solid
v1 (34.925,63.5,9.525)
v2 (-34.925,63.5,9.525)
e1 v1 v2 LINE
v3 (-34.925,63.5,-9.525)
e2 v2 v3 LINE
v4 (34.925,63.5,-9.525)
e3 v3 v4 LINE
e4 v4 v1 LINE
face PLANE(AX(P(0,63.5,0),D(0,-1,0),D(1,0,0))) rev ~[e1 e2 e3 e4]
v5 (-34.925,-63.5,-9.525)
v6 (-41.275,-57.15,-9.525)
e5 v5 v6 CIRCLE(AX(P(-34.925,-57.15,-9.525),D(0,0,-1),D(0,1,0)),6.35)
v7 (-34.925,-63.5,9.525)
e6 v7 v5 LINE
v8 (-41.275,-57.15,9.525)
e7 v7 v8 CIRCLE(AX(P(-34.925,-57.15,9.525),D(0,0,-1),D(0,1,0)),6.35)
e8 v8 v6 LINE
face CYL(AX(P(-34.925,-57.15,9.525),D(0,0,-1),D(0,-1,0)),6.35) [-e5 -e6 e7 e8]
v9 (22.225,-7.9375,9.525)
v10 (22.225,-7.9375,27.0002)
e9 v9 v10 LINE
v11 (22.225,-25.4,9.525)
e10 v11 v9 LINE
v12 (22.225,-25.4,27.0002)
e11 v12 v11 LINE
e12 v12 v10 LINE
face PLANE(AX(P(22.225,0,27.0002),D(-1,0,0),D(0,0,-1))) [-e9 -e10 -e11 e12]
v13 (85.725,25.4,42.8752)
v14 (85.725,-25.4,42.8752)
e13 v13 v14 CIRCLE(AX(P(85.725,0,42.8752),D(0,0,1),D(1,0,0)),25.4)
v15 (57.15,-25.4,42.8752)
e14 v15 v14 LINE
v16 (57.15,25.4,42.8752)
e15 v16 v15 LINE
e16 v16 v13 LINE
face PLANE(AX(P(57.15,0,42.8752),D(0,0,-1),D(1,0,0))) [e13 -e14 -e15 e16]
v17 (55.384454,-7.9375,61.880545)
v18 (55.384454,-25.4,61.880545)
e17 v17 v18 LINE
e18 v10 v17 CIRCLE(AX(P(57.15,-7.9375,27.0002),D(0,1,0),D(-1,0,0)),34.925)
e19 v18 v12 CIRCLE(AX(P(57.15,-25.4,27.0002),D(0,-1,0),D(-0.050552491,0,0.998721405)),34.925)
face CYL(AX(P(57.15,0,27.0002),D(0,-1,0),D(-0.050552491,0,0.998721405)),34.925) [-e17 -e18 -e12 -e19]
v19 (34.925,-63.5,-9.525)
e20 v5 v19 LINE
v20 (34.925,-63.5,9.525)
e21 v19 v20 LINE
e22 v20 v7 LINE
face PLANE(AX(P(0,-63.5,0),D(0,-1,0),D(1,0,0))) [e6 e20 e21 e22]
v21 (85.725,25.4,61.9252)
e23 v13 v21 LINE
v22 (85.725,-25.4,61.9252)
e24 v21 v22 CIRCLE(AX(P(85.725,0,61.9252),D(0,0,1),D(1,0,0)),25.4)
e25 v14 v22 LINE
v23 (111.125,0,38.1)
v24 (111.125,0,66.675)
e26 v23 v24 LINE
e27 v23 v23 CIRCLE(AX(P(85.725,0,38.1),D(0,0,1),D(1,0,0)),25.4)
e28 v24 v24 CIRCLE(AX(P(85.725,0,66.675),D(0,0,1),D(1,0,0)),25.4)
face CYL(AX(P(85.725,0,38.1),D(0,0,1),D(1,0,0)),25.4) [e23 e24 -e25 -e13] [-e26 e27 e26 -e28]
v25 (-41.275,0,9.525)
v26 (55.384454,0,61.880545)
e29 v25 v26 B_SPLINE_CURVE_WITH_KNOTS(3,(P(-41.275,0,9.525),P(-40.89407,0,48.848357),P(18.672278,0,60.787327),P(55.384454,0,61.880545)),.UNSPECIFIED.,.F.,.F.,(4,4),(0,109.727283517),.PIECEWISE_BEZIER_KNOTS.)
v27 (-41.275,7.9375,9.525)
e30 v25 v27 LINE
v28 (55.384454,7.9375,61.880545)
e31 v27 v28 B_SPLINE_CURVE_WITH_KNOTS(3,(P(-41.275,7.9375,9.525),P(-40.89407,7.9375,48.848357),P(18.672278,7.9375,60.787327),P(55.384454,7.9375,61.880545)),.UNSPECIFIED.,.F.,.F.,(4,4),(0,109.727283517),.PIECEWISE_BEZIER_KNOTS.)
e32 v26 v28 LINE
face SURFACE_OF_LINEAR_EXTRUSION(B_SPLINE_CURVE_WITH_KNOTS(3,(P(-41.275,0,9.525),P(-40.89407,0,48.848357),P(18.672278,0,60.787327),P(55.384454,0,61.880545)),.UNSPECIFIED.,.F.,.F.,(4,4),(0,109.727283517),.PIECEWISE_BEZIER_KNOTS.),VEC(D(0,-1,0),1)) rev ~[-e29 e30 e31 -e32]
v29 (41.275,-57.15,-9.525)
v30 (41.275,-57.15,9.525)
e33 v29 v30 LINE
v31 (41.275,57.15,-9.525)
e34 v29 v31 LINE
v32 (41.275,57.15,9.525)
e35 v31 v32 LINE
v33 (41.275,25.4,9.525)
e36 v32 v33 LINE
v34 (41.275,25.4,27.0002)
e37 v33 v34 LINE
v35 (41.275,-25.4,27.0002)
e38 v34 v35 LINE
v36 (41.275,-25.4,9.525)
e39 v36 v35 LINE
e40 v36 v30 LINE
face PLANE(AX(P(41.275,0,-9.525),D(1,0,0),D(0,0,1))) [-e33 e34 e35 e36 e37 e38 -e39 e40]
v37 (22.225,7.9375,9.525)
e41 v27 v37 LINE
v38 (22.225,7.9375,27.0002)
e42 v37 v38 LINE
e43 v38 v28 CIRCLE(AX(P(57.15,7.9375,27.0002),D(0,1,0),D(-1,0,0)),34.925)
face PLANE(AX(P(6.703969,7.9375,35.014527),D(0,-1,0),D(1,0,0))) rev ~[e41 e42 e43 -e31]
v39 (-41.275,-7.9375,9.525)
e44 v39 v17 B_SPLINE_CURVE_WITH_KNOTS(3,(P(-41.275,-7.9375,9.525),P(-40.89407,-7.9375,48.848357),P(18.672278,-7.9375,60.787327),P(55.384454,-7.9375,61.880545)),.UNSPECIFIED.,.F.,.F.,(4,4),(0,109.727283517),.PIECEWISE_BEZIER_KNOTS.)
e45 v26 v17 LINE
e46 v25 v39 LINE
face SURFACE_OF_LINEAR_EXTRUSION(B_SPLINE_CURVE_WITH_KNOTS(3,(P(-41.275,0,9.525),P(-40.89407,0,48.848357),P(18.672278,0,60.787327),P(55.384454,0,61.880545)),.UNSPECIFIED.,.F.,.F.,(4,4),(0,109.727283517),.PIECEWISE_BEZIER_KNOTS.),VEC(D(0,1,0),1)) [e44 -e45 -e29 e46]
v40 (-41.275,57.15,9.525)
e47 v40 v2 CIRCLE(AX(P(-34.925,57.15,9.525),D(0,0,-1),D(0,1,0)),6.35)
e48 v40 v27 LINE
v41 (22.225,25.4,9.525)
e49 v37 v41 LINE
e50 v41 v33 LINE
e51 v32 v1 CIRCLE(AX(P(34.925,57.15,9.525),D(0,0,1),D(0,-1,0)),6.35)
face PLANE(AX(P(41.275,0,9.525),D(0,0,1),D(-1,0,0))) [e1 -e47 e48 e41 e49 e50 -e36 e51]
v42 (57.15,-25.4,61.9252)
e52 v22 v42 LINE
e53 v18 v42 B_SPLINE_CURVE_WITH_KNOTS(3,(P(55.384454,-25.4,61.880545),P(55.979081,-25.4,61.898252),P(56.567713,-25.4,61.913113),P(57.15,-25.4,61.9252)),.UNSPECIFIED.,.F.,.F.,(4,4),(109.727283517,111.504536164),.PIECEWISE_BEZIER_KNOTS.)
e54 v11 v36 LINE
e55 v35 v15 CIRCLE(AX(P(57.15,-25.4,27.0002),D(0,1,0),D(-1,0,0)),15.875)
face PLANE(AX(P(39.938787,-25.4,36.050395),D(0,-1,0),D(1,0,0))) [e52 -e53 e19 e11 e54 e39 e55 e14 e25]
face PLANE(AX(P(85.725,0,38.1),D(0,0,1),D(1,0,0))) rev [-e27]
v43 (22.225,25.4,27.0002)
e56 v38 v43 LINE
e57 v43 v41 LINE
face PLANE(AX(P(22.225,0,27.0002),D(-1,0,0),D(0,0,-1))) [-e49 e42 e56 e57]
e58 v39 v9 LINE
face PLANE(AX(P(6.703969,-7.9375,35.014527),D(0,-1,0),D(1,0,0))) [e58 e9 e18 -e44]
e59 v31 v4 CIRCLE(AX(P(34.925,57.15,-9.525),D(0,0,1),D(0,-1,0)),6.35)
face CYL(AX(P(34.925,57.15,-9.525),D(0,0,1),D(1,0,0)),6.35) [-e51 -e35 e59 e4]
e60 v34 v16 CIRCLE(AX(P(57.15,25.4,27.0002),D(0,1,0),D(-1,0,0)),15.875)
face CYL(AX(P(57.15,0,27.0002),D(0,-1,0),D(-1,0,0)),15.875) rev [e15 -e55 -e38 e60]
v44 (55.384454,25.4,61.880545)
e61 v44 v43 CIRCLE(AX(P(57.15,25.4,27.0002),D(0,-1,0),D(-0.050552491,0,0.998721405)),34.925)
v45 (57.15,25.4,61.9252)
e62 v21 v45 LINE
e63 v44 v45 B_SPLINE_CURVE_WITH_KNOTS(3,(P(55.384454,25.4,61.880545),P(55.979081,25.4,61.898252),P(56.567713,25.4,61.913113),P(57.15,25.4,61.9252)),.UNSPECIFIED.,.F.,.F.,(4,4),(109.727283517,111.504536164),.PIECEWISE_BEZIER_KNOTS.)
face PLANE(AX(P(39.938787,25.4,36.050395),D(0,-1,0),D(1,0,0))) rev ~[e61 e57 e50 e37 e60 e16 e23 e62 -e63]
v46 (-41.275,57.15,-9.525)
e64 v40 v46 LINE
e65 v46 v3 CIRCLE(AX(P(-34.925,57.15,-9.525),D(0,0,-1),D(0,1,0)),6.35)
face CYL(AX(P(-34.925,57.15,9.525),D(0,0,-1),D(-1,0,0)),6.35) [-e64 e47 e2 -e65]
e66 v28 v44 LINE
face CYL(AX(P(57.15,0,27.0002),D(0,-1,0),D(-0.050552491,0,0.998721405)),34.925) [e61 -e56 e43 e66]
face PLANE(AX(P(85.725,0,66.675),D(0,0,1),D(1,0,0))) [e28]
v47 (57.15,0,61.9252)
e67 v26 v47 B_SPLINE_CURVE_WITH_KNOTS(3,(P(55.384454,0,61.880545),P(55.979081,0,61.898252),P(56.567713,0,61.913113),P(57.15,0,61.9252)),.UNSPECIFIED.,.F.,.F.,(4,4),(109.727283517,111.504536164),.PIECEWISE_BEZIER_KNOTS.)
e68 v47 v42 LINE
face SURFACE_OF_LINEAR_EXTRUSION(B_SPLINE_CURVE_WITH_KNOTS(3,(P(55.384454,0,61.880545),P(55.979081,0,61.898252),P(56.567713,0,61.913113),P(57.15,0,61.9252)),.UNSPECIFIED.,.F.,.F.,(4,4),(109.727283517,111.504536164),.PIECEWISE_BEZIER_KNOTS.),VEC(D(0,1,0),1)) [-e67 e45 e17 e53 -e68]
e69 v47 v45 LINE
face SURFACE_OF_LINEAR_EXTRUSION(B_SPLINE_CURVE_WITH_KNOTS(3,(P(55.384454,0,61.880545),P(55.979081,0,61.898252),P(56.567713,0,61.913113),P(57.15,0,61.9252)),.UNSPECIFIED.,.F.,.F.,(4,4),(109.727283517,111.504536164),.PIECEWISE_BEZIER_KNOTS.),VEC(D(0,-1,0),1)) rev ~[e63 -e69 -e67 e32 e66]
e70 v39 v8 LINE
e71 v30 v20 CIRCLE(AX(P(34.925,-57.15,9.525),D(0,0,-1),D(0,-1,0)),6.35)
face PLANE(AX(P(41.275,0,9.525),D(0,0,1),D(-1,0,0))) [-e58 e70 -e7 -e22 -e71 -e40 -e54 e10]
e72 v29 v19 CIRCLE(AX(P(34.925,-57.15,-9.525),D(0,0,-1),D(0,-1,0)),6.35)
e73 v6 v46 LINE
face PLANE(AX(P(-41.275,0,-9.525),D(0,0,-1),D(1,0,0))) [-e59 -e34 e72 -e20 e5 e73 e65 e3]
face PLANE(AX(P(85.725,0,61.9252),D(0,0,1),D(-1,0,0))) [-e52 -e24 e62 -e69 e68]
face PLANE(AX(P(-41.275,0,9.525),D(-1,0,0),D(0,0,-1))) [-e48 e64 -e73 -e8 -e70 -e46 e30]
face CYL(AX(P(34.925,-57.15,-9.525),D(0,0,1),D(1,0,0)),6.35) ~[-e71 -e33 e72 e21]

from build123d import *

# Parameters (mm, degrees)
F1_DEPTH = 63.5
F2_DEPTH = 25.4
F3_DEPTH = 7.9375
F5_R     = 6.35


# Not quite as in the source:
# - a feature names something its author has since deleted; it is built from what else it names


with BuildPart() as f1:
    # F0 (on Front) → F1 (new body, symmetric)
    with BuildSketch(Plane.XZ):
        Polygon((41.275, -9.525), (41.275, 9.525), (22.225, 9.525), (-41.275, 9.525), (-41.275, -9.525), align=None)
    extrude(amount=F1_DEPTH, both=True)

    # F0 (on Front) → F2 (join, symmetric)
    with BuildSketch(Plane.XZ):
        with BuildLine():
            Line((22.225, 9.525), (41.275, 9.525))
            Line((41.275, 9.525), (41.275, 27.0002))
            ThreePointArc((41.275, 27.0002), (45.9246798487, 38.2255201513), (57.15, 42.8752))
            Line((57.15, 42.8752), (60.325, 42.8752))
            Line((60.325, 42.8752), (60.325, 61.9252))
            Line((60.325, 61.9252), (57.15, 61.9252))
            add(Edge.make_bspline(
                [(55.3844542669, 61.8805450852), (55.9790813374, 61.8982519362), (56.5677127817, 61.9131134827), (57.15, 61.9252)],
                knots=[109.7272835167, 109.7272835167, 109.7272835167, 109.7272835167, 111.5045361635, 111.5045361635, 111.5045361635, 111.5045361635], degree=3))
            ThreePointArc((55.3844542669, 61.8805450852), (31.8377765721, 51.0635948173), (22.225, 27.0002))
            Line((22.225, 27.0002), (22.225, 9.525))
        make_face()
        Polygon((60.325, 61.9252), (60.325, 42.8752), (71.4375, 42.8752), (85.725, 42.8752), (85.725, 61.9252), (71.4375, 61.9252), align=None)
    extrude(amount=F2_DEPTH, both=True)

    # F0 (on Front) → F3 (join, symmetric)
    with BuildSketch(Plane.XZ):
        with BuildLine():
            Line((-41.275, 9.525), (22.225, 9.525))
            Line((22.225, 9.525), (22.225, 27.0002))
            ThreePointArc((22.225, 27.0002), (31.8377765721, 51.0635948173), (55.3844542669, 61.8805450852))
            add(Edge.make_bspline(
                [(-41.275, 9.525), (-40.8940696255, 48.8483570296), (18.6722776014, 60.7873270442), (55.3844542669, 61.8805450852)],
                knots=[0, 0, 0, 0, 109.7272835167, 109.7272835167, 109.7272835167, 109.7272835167], degree=3))
        make_face()
    extrude(amount=F3_DEPTH, both=True)

    # F0 (on Front) → F4 (revolve)
    with BuildSketch(Plane.XZ):
        Polygon((85.725, 42.8752), (85.725, 38.1), (111.125, 38.1), (111.125, 66.675), (85.725, 66.675), (85.725, 61.9252), align=None)
    revolve(axis=Axis((85.725, 0, 52.4002), (0, 0, 1)))

    # F5
    f5_edges = [f1.edges().sort_by_distance(p)[0] for p in [
        (-41.275, -63.5, 0),
        (41.275, -63.5, 0),
        (41.275, 63.5, 0),
        (-41.275, 63.5, 0),
    ]]
    fillet(f5_edges, radius=F5_R)


solid = f1.part
